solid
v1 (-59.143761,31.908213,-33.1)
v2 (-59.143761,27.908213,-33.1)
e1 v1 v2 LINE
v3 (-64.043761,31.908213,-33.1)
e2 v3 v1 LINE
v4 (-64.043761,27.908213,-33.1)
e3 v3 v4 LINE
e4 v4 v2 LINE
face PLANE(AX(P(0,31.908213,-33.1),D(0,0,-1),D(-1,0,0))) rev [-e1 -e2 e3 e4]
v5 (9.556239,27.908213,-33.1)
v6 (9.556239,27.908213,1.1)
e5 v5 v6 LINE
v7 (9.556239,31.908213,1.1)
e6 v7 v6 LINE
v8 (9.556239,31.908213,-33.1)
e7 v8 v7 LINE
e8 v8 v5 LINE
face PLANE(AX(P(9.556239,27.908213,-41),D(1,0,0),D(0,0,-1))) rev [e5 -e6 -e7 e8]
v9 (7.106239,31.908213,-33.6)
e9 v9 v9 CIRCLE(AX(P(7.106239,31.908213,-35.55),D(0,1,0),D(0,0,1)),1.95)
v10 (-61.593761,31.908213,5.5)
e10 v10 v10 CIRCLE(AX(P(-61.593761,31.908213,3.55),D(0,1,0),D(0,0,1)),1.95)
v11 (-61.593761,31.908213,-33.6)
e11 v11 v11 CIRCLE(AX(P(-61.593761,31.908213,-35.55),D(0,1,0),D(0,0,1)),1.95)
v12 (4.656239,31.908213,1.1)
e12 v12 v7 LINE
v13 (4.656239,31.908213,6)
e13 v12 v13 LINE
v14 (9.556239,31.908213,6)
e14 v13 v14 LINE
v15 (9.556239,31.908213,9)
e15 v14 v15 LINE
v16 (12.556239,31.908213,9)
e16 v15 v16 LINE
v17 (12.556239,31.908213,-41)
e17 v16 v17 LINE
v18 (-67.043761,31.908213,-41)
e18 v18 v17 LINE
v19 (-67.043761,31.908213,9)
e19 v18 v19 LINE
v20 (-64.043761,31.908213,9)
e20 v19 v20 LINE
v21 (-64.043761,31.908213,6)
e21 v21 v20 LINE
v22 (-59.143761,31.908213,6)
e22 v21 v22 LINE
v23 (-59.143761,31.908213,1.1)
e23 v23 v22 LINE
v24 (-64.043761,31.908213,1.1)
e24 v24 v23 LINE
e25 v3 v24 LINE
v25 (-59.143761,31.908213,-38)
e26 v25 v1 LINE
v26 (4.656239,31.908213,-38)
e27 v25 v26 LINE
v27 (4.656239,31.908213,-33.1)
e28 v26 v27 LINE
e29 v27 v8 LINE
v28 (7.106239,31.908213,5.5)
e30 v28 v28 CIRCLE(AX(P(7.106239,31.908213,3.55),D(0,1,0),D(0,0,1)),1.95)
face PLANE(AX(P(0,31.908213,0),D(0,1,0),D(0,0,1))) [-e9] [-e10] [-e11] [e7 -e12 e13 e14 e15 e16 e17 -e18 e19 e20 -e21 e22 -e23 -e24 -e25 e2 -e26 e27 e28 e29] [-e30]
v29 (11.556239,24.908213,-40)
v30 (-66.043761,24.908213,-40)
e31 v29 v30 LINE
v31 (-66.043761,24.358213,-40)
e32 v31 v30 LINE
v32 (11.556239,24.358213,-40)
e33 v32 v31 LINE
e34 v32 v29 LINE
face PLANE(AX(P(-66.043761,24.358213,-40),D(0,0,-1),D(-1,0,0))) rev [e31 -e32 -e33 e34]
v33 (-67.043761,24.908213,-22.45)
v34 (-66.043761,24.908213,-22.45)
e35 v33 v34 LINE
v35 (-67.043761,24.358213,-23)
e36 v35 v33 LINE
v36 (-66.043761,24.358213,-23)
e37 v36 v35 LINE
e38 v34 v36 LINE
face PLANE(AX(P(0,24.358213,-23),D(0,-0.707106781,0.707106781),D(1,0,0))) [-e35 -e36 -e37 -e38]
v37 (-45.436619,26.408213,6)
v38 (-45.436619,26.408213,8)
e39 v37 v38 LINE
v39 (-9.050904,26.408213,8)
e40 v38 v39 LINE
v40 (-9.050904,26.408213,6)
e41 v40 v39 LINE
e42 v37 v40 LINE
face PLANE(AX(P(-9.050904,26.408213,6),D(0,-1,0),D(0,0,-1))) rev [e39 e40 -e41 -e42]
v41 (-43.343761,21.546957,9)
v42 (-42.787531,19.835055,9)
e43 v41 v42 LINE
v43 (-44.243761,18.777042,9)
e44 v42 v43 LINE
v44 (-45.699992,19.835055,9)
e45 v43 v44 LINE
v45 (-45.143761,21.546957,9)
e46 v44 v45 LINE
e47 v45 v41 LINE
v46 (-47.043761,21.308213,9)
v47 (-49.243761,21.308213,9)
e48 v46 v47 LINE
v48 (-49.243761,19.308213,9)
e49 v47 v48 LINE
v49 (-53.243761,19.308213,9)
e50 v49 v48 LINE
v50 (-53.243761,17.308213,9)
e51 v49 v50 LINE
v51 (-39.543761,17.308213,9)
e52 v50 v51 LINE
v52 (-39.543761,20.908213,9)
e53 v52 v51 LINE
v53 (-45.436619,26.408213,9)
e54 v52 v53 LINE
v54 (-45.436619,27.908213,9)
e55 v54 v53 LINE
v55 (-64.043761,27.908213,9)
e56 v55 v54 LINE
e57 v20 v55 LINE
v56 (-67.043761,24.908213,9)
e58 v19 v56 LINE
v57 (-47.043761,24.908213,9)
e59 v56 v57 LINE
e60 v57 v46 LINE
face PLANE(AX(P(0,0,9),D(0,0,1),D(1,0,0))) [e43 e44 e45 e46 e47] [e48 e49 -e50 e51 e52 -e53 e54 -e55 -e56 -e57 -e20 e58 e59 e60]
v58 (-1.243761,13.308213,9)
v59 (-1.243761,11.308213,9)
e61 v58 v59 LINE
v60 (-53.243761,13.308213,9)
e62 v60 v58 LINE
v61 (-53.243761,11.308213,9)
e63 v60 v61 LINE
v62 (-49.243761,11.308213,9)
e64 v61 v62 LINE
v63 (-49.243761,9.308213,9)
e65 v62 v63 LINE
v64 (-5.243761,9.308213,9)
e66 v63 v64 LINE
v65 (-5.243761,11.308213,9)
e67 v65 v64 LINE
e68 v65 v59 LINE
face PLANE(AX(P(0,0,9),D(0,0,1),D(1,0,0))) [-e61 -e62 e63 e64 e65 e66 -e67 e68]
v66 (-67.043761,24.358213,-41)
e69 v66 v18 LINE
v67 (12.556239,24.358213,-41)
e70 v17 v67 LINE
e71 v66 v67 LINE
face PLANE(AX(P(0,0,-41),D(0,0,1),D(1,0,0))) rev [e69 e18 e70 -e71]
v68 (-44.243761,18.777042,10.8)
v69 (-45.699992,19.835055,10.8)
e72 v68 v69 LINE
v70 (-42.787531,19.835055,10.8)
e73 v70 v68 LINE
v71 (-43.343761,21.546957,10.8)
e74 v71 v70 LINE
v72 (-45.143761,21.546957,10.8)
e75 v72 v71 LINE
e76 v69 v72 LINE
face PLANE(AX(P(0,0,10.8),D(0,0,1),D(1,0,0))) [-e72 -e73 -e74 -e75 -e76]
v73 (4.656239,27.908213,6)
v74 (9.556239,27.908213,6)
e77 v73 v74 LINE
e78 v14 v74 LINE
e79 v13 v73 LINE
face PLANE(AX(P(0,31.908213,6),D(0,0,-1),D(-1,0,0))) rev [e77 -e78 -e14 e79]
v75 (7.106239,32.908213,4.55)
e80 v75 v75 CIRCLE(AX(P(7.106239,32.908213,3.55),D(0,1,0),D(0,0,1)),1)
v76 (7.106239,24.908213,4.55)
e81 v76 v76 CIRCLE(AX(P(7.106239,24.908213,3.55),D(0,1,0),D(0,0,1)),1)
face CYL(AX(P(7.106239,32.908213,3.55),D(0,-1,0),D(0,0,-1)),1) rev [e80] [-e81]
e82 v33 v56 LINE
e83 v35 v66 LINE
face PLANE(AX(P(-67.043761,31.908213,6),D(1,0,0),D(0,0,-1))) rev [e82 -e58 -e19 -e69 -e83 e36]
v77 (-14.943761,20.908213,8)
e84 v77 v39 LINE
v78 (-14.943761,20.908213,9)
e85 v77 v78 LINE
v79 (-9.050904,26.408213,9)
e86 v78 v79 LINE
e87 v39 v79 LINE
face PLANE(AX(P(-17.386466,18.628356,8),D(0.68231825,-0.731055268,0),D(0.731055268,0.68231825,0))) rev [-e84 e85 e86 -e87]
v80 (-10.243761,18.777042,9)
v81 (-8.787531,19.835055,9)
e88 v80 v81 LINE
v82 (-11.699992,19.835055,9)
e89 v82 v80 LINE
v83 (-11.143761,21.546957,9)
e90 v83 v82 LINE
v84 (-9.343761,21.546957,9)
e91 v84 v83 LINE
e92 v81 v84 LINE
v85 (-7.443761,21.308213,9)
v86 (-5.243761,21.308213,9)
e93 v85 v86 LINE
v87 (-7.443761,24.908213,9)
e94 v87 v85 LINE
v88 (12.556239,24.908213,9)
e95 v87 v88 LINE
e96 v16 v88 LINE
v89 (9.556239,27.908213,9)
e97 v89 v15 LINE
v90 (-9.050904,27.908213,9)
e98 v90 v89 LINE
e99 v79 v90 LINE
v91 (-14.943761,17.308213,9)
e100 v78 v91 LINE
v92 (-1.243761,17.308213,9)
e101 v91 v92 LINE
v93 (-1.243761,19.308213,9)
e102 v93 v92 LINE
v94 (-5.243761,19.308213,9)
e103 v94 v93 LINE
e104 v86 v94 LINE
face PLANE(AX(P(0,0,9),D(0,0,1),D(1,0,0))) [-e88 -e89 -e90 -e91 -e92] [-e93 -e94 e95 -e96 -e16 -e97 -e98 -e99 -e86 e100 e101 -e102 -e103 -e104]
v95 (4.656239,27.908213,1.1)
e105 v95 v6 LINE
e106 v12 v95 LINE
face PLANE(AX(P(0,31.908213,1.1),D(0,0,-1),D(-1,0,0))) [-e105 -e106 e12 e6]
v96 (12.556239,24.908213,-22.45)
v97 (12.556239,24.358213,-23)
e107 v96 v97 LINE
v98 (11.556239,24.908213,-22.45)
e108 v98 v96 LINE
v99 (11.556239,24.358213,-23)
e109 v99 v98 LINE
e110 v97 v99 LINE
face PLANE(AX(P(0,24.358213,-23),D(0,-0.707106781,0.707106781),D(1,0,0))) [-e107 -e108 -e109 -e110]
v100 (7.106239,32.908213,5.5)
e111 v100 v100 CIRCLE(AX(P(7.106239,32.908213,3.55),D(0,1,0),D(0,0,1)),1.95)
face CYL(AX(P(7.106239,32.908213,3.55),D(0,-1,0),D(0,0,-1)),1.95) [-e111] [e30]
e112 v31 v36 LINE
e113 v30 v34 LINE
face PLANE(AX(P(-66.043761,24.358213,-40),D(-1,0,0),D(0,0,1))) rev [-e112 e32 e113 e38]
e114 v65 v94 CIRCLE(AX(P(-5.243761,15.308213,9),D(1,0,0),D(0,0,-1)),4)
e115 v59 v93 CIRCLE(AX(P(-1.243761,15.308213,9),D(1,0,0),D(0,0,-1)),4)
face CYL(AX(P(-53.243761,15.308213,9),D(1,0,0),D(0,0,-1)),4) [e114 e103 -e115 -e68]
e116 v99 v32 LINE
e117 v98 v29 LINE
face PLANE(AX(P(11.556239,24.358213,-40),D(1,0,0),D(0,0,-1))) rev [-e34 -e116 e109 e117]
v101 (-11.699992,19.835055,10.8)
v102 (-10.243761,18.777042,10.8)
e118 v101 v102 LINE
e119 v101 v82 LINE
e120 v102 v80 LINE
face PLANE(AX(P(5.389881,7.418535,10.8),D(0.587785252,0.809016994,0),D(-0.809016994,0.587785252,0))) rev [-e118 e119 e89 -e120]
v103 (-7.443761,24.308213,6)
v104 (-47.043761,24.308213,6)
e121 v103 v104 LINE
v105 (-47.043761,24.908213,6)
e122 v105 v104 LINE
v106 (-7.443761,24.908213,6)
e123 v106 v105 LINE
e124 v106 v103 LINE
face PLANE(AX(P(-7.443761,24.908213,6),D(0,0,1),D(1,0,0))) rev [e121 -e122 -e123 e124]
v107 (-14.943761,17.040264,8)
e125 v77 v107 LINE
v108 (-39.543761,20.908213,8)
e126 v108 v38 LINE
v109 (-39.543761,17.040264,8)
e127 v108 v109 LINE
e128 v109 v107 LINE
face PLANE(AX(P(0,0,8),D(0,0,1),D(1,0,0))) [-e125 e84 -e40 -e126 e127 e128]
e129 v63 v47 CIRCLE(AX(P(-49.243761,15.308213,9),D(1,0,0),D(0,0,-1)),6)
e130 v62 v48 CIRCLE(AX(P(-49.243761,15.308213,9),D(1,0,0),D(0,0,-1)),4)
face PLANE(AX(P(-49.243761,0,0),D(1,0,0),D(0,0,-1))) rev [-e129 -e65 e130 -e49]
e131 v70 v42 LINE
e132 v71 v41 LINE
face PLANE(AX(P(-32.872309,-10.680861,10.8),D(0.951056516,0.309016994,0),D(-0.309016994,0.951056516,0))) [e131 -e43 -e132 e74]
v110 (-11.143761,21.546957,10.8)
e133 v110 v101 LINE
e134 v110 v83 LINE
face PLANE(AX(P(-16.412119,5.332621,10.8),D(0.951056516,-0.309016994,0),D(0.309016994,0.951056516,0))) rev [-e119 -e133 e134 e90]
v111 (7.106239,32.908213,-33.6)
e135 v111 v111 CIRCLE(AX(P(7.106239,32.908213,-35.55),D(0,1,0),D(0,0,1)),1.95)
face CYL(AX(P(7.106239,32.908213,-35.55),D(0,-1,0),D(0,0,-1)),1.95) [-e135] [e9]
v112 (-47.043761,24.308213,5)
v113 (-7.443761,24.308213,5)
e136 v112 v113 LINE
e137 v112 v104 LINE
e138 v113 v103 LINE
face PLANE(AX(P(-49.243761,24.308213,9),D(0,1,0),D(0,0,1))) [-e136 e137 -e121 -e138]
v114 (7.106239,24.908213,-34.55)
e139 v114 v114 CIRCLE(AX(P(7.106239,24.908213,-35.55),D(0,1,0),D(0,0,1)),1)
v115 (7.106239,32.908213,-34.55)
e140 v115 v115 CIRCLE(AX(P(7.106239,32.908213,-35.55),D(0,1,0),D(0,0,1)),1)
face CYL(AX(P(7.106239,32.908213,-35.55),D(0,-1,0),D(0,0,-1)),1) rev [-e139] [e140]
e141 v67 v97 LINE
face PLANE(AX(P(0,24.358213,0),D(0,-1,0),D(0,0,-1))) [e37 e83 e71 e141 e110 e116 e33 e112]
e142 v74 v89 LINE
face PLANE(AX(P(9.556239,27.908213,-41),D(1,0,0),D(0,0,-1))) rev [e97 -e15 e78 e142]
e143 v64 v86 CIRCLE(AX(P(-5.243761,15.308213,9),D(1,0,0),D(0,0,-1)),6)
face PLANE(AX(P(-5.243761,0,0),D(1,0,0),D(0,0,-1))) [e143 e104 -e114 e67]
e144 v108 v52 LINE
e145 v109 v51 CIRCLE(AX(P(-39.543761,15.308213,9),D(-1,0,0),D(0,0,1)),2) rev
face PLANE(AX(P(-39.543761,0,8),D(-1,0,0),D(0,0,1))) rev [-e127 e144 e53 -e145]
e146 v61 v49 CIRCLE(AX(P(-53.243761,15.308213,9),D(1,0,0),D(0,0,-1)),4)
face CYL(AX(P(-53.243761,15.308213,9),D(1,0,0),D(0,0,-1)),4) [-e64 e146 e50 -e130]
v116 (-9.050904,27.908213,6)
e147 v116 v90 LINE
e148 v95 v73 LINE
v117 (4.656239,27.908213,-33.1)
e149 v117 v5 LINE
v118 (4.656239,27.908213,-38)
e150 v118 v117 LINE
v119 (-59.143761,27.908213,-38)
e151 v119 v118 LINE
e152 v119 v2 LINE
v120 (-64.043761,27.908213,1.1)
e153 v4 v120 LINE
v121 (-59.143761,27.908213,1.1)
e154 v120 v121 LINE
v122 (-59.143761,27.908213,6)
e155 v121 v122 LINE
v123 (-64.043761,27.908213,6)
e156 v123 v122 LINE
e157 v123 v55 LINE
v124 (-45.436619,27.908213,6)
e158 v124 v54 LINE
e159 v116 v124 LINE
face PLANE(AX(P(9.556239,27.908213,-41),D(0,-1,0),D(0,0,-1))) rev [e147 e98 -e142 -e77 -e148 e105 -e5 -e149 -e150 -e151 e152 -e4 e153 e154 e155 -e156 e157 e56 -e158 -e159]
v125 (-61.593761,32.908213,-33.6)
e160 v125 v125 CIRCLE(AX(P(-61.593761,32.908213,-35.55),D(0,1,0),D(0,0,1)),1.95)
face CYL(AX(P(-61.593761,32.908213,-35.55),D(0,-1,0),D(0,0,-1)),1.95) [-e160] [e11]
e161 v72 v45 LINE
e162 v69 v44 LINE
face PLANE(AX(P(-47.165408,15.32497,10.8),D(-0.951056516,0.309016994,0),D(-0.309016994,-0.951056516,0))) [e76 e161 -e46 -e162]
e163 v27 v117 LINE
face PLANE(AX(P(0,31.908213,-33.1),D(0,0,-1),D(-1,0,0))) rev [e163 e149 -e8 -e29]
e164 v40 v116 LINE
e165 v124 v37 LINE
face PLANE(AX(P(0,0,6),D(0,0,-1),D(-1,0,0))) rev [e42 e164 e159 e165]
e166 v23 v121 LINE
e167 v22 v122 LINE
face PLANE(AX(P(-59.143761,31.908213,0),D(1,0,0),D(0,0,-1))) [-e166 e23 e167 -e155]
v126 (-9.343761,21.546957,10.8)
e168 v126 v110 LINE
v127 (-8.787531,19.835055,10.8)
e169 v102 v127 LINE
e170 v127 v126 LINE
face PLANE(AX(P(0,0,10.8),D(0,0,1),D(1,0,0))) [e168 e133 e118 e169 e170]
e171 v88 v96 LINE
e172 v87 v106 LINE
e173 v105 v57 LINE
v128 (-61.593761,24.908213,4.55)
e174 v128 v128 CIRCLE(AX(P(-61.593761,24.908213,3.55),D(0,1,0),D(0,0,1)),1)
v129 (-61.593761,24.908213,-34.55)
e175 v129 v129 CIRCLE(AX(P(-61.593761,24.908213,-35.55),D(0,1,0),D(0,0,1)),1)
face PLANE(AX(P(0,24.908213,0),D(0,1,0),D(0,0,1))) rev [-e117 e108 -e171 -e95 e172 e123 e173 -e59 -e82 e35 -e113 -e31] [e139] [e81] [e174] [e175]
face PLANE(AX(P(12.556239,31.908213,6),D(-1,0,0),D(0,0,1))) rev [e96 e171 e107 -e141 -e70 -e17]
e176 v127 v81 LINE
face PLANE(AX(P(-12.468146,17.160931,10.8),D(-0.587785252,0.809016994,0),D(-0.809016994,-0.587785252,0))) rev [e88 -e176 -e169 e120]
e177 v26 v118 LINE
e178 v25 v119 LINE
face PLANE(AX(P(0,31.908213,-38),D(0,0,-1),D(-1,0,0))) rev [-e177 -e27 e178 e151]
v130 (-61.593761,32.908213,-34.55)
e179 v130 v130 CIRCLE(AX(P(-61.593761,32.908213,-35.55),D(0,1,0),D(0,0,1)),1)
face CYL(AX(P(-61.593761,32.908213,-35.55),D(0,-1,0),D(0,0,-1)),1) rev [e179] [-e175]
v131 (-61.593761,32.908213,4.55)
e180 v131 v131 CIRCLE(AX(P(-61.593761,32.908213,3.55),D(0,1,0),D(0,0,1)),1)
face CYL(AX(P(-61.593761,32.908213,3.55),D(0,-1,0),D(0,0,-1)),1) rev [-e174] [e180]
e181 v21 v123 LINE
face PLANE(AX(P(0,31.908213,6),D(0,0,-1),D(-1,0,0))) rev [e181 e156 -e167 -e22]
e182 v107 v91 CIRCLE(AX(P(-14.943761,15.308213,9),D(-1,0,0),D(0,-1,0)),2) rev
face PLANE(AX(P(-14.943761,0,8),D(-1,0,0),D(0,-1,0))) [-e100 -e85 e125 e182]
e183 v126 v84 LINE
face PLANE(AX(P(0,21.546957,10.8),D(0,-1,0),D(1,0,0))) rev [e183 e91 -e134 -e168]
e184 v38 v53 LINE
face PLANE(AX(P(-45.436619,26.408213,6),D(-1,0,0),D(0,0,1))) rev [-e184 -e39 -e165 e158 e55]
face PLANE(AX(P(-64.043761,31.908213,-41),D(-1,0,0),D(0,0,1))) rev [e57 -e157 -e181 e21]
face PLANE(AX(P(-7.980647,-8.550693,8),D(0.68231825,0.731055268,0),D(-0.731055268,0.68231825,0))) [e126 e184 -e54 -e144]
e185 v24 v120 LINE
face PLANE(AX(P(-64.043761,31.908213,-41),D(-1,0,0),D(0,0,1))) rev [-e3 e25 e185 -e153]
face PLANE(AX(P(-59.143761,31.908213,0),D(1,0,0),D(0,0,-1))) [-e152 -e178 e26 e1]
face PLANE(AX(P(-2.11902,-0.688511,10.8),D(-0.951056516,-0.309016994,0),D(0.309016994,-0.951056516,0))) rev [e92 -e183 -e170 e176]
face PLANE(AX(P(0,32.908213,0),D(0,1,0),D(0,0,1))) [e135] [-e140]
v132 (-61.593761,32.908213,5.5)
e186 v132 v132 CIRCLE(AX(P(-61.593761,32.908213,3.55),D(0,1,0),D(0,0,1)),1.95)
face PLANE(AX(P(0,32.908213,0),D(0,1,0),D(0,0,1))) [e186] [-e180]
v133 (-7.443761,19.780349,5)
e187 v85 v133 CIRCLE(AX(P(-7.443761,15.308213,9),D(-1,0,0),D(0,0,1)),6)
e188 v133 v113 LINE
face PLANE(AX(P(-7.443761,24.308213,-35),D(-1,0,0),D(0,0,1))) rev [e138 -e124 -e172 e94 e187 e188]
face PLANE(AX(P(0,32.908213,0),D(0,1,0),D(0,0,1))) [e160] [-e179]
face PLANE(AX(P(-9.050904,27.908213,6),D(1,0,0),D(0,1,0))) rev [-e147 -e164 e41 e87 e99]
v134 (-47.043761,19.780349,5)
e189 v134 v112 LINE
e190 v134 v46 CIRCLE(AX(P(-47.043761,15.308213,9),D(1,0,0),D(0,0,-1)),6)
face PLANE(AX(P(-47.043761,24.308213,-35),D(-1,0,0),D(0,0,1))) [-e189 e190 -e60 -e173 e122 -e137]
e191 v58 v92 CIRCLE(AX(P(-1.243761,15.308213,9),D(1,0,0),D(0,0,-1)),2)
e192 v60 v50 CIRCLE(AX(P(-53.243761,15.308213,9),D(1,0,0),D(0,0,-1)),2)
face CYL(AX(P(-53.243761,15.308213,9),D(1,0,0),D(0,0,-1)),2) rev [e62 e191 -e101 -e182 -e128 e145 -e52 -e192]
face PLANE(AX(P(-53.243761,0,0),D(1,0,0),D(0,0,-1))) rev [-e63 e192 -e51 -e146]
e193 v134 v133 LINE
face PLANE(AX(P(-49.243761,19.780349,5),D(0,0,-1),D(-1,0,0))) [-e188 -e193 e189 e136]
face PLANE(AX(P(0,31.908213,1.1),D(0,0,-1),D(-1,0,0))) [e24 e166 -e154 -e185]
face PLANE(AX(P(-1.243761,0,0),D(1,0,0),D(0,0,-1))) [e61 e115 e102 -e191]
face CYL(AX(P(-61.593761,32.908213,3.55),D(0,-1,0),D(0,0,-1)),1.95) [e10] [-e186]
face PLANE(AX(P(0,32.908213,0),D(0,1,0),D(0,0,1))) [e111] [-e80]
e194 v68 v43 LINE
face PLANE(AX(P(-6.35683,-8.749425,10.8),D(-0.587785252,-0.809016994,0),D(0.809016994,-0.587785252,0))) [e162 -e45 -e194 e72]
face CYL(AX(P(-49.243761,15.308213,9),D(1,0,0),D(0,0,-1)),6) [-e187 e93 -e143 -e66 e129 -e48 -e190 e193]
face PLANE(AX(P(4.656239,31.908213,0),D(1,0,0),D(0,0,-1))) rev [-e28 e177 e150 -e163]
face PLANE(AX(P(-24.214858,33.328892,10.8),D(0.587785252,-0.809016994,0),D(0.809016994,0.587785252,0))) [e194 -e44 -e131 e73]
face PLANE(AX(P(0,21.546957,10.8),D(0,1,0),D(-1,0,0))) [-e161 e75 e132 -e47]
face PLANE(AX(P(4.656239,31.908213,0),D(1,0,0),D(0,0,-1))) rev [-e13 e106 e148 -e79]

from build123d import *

# Parameters (mm, degrees)
IZIM2_W                          = 40
IZIM2_H                          = 16
Y_KSEKLIK_EKSTR_ZYON4_DEPTH      = 9
Y_KSEKLIK_EKSTR_ZYON5_DEPTH      = 2
Y_KSEKLIK_EKSTR_ZYON5_DEPTH_BACK = 42
Y_KSEKLIK_EKSTR_ZYON6_DEPTH      = 6
Y_KSEKLIK_EKSTR_ZYON6_DEPTH_BACK = 46
KES_EKSTR_ZYON1_DEPTH            = 52
KES_EKSTR_ZYON2_DEPTH            = 53.347615077
KES_EKSTR_ZYON2_DEPTH_BACK       = 52
IZIM3_4_W                        = 9
IZIM3_4_H                        = 16
Y_KSEKLIK_EKSTR_ZYON7_DEPTH      = 44
KES_EKSTR_ZYON4_DEPTH            = 44
KES_EKSTR_ZYON8_DEPTH            = 2.2
KES_EKSTR_ZYON9_DEPTH            = 2.2
IZIM14_W                         = 39.6
IZIM14_H                         = 3
ARALIK_EKS_DEPTH                 = 0.6
Y_KSEKLIK_EKSTR_ZYON9_DEPTH      = 7
Y_KSEKLIK_EKSTR_ZYON11_DEPTH     = 47
IZIM17_W                         = 73.6
IZIM17_H                         = 4
KES_EKSTR_ZYON10_DEPTH           = 10
IZIM18_W                         = 4.9
IZIM18_H                         = 4.9
IZIM18_R                         = 1.95
Y_KSEKLIK_EKSTR_ZYON12_DEPTH     = 4
IZIM18_3_R                       = 1.95
IZIM18_3_R_2                     = 1
Y_KSEKLIK_EKSTR_ZYON13_DEPTH     = 5
IZIM18_4_R                       = 1
KES_EKSTR_ZYON11_DEPTH           = 7
KES_EKSTR_ZYON12_DEPTH           = 1
IZIM21_W                         = 36.385714286
IZIM21_H                         = 1.5
KES_EKSTR_ZYON13_DEPTH           = 3
Y_KSEKLIK_EKSTR_ZYON14_DEPTH     = 1.8
Y_KSEKLIK_EKSTR_ZYON15_DEPTH     = 0.55
PAH1_SIZE                        = 1


with BuildPart() as part:
    # Çizim2 → Yükseklik-Ekstrüzyon4 (new body)
    with BuildSketch(Plane.XY):
        with Locations((-27.243761407, 15.308213235)):
            Rectangle(IZIM2_W, IZIM2_H)
    extrude(amount=Y_KSEKLIK_EKSTR_ZYON4_DEPTH)

    # Çizim3 → Yükseklik-Ekstrüzyon5 (add, two sides: drawn at the far end of the back side and taken through both)
    with BuildSketch(Plane(origin=(-7.243761407, 0, 0), x_dir=(0, 0, -1), z_dir=(1, 0, 0)).offset(-Y_KSEKLIK_EKSTR_ZYON5_DEPTH_BACK)):
        with BuildLine():
            ThreePointArc((-9, 9.308213235), (-3, 15.308213235), (-9, 21.308213235))
            Line((-9, 21.308213235), (-9, 19.308213235))
            ThreePointArc((-9, 19.308213235), (-5, 15.308213235), (-9, 11.308213235))
            Line((-9, 11.308213235), (-9, 9.308213235))
        make_face()
    extrude(amount=Y_KSEKLIK_EKSTR_ZYON5_DEPTH + Y_KSEKLIK_EKSTR_ZYON5_DEPTH_BACK)

    # Çizim3<3> → Yükseklik-Ekstrüzyon6 (add, two sides: drawn at the far end of the back side and taken through both)
    with BuildSketch(Plane(origin=(-7.243761407, 0, 0), x_dir=(0, 0, -1), z_dir=(1, 0, 0)).offset(-Y_KSEKLIK_EKSTR_ZYON6_DEPTH_BACK)):
        with BuildLine():
            ThreePointArc((-9, 11.308213235), (-5, 15.308213235), (-9, 19.308213235))
            Line((-9, 19.308213235), (-9, 11.308213235))
        make_face()
    extrude(amount=Y_KSEKLIK_EKSTR_ZYON6_DEPTH + Y_KSEKLIK_EKSTR_ZYON6_DEPTH_BACK)

    # Çizim4 → Kes-Ekstrüzyon1 (cut)
    with BuildSketch(Plane(origin=(-1.243761407, 0, 0), x_dir=(0, 0, -1), z_dir=(1, 0, 0))):
        with BuildLine():
            Line((-9, 17.308213235), (-9, 13.308213235))
            ThreePointArc((-9, 13.308213235), (-7, 15.308213235), (-9, 17.308213235))
        make_face()
    extrude(amount=-KES_EKSTR_ZYON1_DEPTH, mode=Mode.SUBTRACT)

    # Çizim3<4> → Kes-Ekstrüzyon2 (cut, two sides: drawn at the far end of the back side and taken through both)
    with BuildSketch(Plane(origin=(-7.243761407, 0, 0), x_dir=(0, 0, -1), z_dir=(1, 0, 0)).offset(-KES_EKSTR_ZYON2_DEPTH_BACK)):
        with Locations((-4.5, 15.308213235)):
            Rectangle(IZIM3_4_W, IZIM3_4_H)
        with BuildLine():
            ThreePointArc((-9, 9.308213235), (-3, 15.308213235), (-9, 21.308213235))
            Line((-9, 21.308213235), (-9, 9.308213235))
        make_face(mode=Mode.SUBTRACT)
    extrude(amount=KES_EKSTR_ZYON2_DEPTH + KES_EKSTR_ZYON2_DEPTH_BACK, mode=Mode.SUBTRACT)


with BuildPart() as kes_ekstr_zyon2_kept_piece:
    # of the separate pieces the step leaves, the one the design keeps (kes_ekstr_zyon2_pieces_kept)
    add(part.part.solids().sort_by_distance((-49.243761407, 9.308213235, 9))[0])

    # Çizim7 → Yükseklik-Ekstrüzyon7 (add)
    with BuildSketch(Plane(origin=(-5.243761407, 0, 0), x_dir=(0, 0, -1), z_dir=(1, 0, 0))):
        with BuildLine():
            Line((-5, 19.78034919), (-5, 24.308213235))
            Line((-5, 24.308213235), (-9, 24.308213235))
            Line((-9, 24.308213235), (-9, 21.308213235))
            ThreePointArc((-9, 21.308213235), (-6.859067461, 20.913247389), (-5, 19.78034919))
        make_face()
    extrude(amount=-Y_KSEKLIK_EKSTR_ZYON7_DEPTH)

    # Çizim8 → Kes-Ekstrüzyon4 (cut)
    with BuildSketch(Plane.XY.offset(9)):
        Polygon((-7.443761407, 24.308213235), (-7.443761407, 21.308213235), (-5.243761407, 21.308213235), (-5.243761407, 22.308213235), (-5.243761407, 24.308213235), align=None)
        Polygon((-49.243761407, 24.308213235), (-47.043761407, 24.308213235), (-47.043761407, 21.308213235), (-49.243761407, 21.308213235), (-49.243761407, 22.308213235), align=None)
    extrude(amount=-KES_EKSTR_ZYON4_DEPTH, mode=Mode.SUBTRACT)

    # Çizim7<3> → Kes-Ekstrüzyon8 (cut)
    with BuildSketch(Plane(origin=(-5.243761407, 0, 0), x_dir=(0, 0, -1), z_dir=(1, 0, 0))):
        with BuildLine():
            Line((-5, 19.78034919), (-5, 24.308213235))
            Line((-5, 24.308213235), (-9, 24.308213235))
            Line((-9, 24.308213235), (-9, 21.308213235))
            ThreePointArc((-9, 21.308213235), (-6.859067461, 20.913247389), (-5, 19.78034919))
        make_face()
    extrude(amount=-KES_EKSTR_ZYON8_DEPTH, mode=Mode.SUBTRACT)

    # Çizim12 → Kes-Ekstrüzyon9 (cut)
    with BuildSketch(Plane.ZY.offset(49.243761407)):
        with BuildLine():
            Line((5, 19.78034919), (5, 21.308213235))
            Line((5, 21.308213235), (9, 21.308213235))
            ThreePointArc((9, 21.308213235), (6.859067461, 20.913247389), (5, 19.78034919))
        make_face()
    extrude(amount=-KES_EKSTR_ZYON9_DEPTH, mode=Mode.SUBTRACT)

    # Çizim14 → aralik_eks (add)
    with BuildSketch(Plane(origin=(0, 24.308213235, 0), x_dir=(1, 0, 0), z_dir=(0, 1, 0))):
        with Locations((-27.243761407, -7.5)):
            Rectangle(IZIM14_W, IZIM14_H)
    extrude(amount=ARALIK_EKS_DEPTH)

    # Çizim15 → Yükseklik-Ekstrüzyon9 (add)
    with BuildSketch(Plane(origin=(0, 24.908213235, 0), x_dir=(1, 0, 0), z_dir=(0, 1, 0))):
        Polygon((-47.043761407, -6), (-67.043761407, -6), (-67.043761407, -9), (-47.043761407, -9), (-7.443761407, -9), (12.556238593, -9), (12.556238593, -6), (-7.443761407, -6), align=None)
    extrude(amount=Y_KSEKLIK_EKSTR_ZYON9_DEPTH)

    # Çizim16 → Yükseklik-Ekstrüzyon11 (add)
    with BuildSketch(Plane(origin=(0, 0, 6), x_dir=(-1, 0, 0), z_dir=(0, 0, -1))):
        Polygon((-12.556238593, 24.908213235), (-12.556238593, 31.908213235), (-9.556238593, 31.908213235), (-9.556238593, 27.908213235), (64.043761407, 27.908213235), (64.043761407, 31.908213235), (67.043761407, 31.908213235), (67.043761407, 24.908213235), align=None)
    extrude(amount=Y_KSEKLIK_EKSTR_ZYON11_DEPTH)

    # Çizim17 → Kes-Ekstrüzyon10 (cut)
    with BuildSketch(Plane(origin=(0, 0, 6), x_dir=(-1, 0, 0), z_dir=(0, 0, -1))):
        with Locations((27.243761407, 29.908213235)):
            Rectangle(IZIM17_W, IZIM17_H)
    extrude(amount=-KES_EKSTR_ZYON10_DEPTH, mode=Mode.SUBTRACT)

    # Çizim18 → Yükseklik-Ekstrüzyon12 (add)
    # profile 1 of 5: a face of its own
    with BuildSketch(Plane(origin=(0, 27.908213235, 0), x_dir=(1, 0, 0), z_dir=(0, 1, 0))):
        with Locations((7.106238593, 35.55)):
            Rectangle(IZIM18_W, IZIM18_H)
        with Locations(Location((7.106238593, 35.55, 0), (0, 0, 270))):
            Circle(IZIM18_R, mode=Mode.SUBTRACT)
    # profile 2 of 5: a face of its own
    with BuildSketch(Plane(origin=(0, 27.908213235, 0), x_dir=(1, 0, 0), z_dir=(0, 1, 0))):
        with Locations((-61.593761407, 35.55)):
            Rectangle(IZIM18_W, IZIM18_H)
        with Locations(Location((-61.593761407, 35.55, 0), (0, 0, 270))):
            Circle(IZIM18_R, mode=Mode.SUBTRACT)
    # profile 3 of 5: a face of its own
    with BuildSketch(Plane(origin=(0, 27.908213235, 0), x_dir=(1, 0, 0), z_dir=(0, 1, 0))):
        Polygon((9.556238593, 41), (-64.043761407, 41), (-64.043761407, 38), (-59.143761407, 38), (4.656238593, 38), (9.556238593, 38), align=None)
    # profile 4 of 5: a face of its own
    with BuildSketch(Plane(origin=(0, 27.908213235, 0), x_dir=(1, 0, 0), z_dir=(0, 1, 0))):
        with Locations((-61.593761407, -3.55)):
            Rectangle(IZIM18_W, IZIM18_H)
        with Locations(Location((-61.593761407, -3.55, 0), (0, 0, 270))):
            Circle(IZIM18_R, mode=Mode.SUBTRACT)
    # profile 5 of 5: a face of its own
    with BuildSketch(Plane(origin=(0, 27.908213235, 0), x_dir=(1, 0, 0), z_dir=(0, 1, 0))):
        with Locations((7.106238593, -3.55)):
            Rectangle(IZIM18_W, IZIM18_H)
        with Locations(Location((7.106238593, -3.55, 0), (0, 0, 270))):
            Circle(IZIM18_R, mode=Mode.SUBTRACT)
    extrude(amount=Y_KSEKLIK_EKSTR_ZYON12_DEPTH)

    # Çizim18<3> → Yükseklik-Ekstrüzyon13 (add)
    # profile 1 of 4: a face of its own
    with BuildSketch(Plane(origin=(0, 27.908213235, 0), x_dir=(1, 0, 0), z_dir=(0, 1, 0))):
        with Locations(Location((-61.593761407, 35.55, 0), (0, 0, 270))):
            Circle(IZIM18_3_R)
        with Locations(Location((-61.593761407, 35.55, 0), (0, 0, 270))):
            Circle(IZIM18_3_R_2, mode=Mode.SUBTRACT)
    # profile 2 of 4: a face of its own
    with BuildSketch(Plane(origin=(0, 27.908213235, 0), x_dir=(1, 0, 0), z_dir=(0, 1, 0))):
        with Locations(Location((7.106238593, 35.55, 0), (0, 0, 270))):
            Circle(IZIM18_3_R)
        with Locations(Location((7.106238593, 35.55, 0), (0, 0, 270))):
            Circle(IZIM18_3_R_2, mode=Mode.SUBTRACT)
    # profile 3 of 4: a face of its own
    with BuildSketch(Plane(origin=(0, 27.908213235, 0), x_dir=(1, 0, 0), z_dir=(0, 1, 0))):
        with Locations(Location((7.106238593, -3.55, 0), (0, 0, 270))):
            Circle(IZIM18_3_R)
        with Locations(Location((7.106238593, -3.55, 0), (0, 0, 270))):
            Circle(IZIM18_3_R_2, mode=Mode.SUBTRACT)
    # profile 4 of 4: a face of its own
    with BuildSketch(Plane(origin=(0, 27.908213235, 0), x_dir=(1, 0, 0), z_dir=(0, 1, 0))):
        with Locations(Location((-61.593761407, -3.55, 0), (0, 0, 270))):
            Circle(IZIM18_3_R)
        with Locations(Location((-61.593761407, -3.55, 0), (0, 0, 270))):
            Circle(IZIM18_3_R_2, mode=Mode.SUBTRACT)
    extrude(amount=Y_KSEKLIK_EKSTR_ZYON13_DEPTH)

    # Çizim18<4> → Kes-Ekstrüzyon11 (cut)
    with BuildSketch(Plane(origin=(0, 27.908213235, 0), x_dir=(1, 0, 0), z_dir=(0, 1, 0))):
        with Locations(Location((-61.593761407, -3.55, 0), (0, 0, 270))):
            Circle(IZIM18_4_R)
        with Locations(Location((-61.593761407, 35.55, 0), (0, 0, 270))):
            Circle(IZIM18_4_R)
        with Locations(Location((7.106238593, 35.55, 0), (0, 0, 270))):
            Circle(IZIM18_4_R)
        with Locations(Location((7.106238593, -3.55, 0), (0, 0, 270))):
            Circle(IZIM18_4_R)
    extrude(amount=-KES_EKSTR_ZYON11_DEPTH, mode=Mode.SUBTRACT)

    # Çizim19 → Kes-Ekstrüzyon12 (cut)
    with BuildSketch(Plane.XY.offset(9)):
        Polygon((-45.43661855, 26.408213235), (-39.543761407, 20.908213235), (-39.543761407, 15.034084551), (-14.943761407, 15.034084551), (-14.943761407, 20.908213235), (-9.050904264, 26.408213235), align=None)
    extrude(amount=-KES_EKSTR_ZYON12_DEPTH, mode=Mode.SUBTRACT)

    # Çizim21 → Kes-Ekstrüzyon13 (cut)
    with BuildSketch(Plane.XY.offset(9)):
        with Locations((-27.243761407, 27.158213235)):
            Rectangle(IZIM21_W, IZIM21_H)
    extrude(amount=-KES_EKSTR_ZYON13_DEPTH, mode=Mode.SUBTRACT)

    # Çizim22 → Yükseklik-Ekstrüzyon14 (add)
    with BuildSketch(Plane.XY.offset(9)):
        Polygon((-44.243761407, 18.77704178), (-45.699991997, 19.835055235), (-45.143761407, 21.546956964), (-43.343761407, 21.546956964), (-42.787530817, 19.835055235), align=None)
        Polygon((-11.143761407, 21.546956964), (-11.699991997, 19.835055235), (-10.243761407, 18.77704178), (-8.787530817, 19.835055235), (-9.343761407, 21.546956964), align=None)
    extrude(amount=Y_KSEKLIK_EKSTR_ZYON14_DEPTH)

    # Çizim23 → Yükseklik-Ekstrüzyon15 (add)
    with BuildSketch(Plane.XZ.offset(-24.908213235)):
        Polygon((-67.043761407, -41), (12.556238593, -41), (12.556238593, -22), (11.556238593, -22), (11.556238593, -40), (-66.043761407, -40), (-66.043761407, -22), (-67.043761407, -22), align=None)
    extrude(amount=Y_KSEKLIK_EKSTR_ZYON15_DEPTH)

    # Pah1
    # the kernel refuses this chamfer: 1 mm, written as the material it takes off along each edge
    with BuildSketch(Plane(origin=(15.127921581, 24.358213235, -22), x_dir=(0, 0.9996219169112968, 0.027495876610585647), z_dir=(-1, 0, 0))) as pah1_piece_1_section:
        Polygon((PAH1_SIZE * 0.999621916911, PAH1_SIZE * 0.0274958766106), (-PAH1_SIZE * 0.0274958766106, PAH1_SIZE * 0.999621916911), (0, 0), align=None)
    pah1_piece_1 = extrude(amount=6.143365976, mode=Mode.PRIVATE)
    pah1_piece_1 = split(pah1_piece_1, bisect_by=Plane(origin=(12.056238593, 24.908213235, -22.383932074), z_dir=(0, -1, 0)), keep=Keep.TOP, mode=Mode.PRIVATE)
    add(pah1_piece_1, mode=Mode.SUBTRACT)
    with BuildSketch(Plane(origin=(-63.472078419, 24.358213235, -22), x_dir=(0, 0.9996219169112968, 0.027495876610585647), z_dir=(-1, 0, 0))) as pah1_piece_2_section:
        Polygon((PAH1_SIZE * 0.999621916911, PAH1_SIZE * 0.0274958766106), (-PAH1_SIZE * 0.0274958766106, PAH1_SIZE * 0.999621916911), (0, 0), align=None)
    pah1_piece_2 = extrude(amount=6.143365976, mode=Mode.PRIVATE)
    pah1_piece_2 = split(pah1_piece_2, bisect_by=Plane(origin=(-66.543761407, 24.908213235, -22.383932074), z_dir=(0, -1, 0)), keep=Keep.TOP, mode=Mode.PRIVATE)
    add(pah1_piece_2, mode=Mode.SUBTRACT)


solid = kes_ekstr_zyon2_kept_piece.part
